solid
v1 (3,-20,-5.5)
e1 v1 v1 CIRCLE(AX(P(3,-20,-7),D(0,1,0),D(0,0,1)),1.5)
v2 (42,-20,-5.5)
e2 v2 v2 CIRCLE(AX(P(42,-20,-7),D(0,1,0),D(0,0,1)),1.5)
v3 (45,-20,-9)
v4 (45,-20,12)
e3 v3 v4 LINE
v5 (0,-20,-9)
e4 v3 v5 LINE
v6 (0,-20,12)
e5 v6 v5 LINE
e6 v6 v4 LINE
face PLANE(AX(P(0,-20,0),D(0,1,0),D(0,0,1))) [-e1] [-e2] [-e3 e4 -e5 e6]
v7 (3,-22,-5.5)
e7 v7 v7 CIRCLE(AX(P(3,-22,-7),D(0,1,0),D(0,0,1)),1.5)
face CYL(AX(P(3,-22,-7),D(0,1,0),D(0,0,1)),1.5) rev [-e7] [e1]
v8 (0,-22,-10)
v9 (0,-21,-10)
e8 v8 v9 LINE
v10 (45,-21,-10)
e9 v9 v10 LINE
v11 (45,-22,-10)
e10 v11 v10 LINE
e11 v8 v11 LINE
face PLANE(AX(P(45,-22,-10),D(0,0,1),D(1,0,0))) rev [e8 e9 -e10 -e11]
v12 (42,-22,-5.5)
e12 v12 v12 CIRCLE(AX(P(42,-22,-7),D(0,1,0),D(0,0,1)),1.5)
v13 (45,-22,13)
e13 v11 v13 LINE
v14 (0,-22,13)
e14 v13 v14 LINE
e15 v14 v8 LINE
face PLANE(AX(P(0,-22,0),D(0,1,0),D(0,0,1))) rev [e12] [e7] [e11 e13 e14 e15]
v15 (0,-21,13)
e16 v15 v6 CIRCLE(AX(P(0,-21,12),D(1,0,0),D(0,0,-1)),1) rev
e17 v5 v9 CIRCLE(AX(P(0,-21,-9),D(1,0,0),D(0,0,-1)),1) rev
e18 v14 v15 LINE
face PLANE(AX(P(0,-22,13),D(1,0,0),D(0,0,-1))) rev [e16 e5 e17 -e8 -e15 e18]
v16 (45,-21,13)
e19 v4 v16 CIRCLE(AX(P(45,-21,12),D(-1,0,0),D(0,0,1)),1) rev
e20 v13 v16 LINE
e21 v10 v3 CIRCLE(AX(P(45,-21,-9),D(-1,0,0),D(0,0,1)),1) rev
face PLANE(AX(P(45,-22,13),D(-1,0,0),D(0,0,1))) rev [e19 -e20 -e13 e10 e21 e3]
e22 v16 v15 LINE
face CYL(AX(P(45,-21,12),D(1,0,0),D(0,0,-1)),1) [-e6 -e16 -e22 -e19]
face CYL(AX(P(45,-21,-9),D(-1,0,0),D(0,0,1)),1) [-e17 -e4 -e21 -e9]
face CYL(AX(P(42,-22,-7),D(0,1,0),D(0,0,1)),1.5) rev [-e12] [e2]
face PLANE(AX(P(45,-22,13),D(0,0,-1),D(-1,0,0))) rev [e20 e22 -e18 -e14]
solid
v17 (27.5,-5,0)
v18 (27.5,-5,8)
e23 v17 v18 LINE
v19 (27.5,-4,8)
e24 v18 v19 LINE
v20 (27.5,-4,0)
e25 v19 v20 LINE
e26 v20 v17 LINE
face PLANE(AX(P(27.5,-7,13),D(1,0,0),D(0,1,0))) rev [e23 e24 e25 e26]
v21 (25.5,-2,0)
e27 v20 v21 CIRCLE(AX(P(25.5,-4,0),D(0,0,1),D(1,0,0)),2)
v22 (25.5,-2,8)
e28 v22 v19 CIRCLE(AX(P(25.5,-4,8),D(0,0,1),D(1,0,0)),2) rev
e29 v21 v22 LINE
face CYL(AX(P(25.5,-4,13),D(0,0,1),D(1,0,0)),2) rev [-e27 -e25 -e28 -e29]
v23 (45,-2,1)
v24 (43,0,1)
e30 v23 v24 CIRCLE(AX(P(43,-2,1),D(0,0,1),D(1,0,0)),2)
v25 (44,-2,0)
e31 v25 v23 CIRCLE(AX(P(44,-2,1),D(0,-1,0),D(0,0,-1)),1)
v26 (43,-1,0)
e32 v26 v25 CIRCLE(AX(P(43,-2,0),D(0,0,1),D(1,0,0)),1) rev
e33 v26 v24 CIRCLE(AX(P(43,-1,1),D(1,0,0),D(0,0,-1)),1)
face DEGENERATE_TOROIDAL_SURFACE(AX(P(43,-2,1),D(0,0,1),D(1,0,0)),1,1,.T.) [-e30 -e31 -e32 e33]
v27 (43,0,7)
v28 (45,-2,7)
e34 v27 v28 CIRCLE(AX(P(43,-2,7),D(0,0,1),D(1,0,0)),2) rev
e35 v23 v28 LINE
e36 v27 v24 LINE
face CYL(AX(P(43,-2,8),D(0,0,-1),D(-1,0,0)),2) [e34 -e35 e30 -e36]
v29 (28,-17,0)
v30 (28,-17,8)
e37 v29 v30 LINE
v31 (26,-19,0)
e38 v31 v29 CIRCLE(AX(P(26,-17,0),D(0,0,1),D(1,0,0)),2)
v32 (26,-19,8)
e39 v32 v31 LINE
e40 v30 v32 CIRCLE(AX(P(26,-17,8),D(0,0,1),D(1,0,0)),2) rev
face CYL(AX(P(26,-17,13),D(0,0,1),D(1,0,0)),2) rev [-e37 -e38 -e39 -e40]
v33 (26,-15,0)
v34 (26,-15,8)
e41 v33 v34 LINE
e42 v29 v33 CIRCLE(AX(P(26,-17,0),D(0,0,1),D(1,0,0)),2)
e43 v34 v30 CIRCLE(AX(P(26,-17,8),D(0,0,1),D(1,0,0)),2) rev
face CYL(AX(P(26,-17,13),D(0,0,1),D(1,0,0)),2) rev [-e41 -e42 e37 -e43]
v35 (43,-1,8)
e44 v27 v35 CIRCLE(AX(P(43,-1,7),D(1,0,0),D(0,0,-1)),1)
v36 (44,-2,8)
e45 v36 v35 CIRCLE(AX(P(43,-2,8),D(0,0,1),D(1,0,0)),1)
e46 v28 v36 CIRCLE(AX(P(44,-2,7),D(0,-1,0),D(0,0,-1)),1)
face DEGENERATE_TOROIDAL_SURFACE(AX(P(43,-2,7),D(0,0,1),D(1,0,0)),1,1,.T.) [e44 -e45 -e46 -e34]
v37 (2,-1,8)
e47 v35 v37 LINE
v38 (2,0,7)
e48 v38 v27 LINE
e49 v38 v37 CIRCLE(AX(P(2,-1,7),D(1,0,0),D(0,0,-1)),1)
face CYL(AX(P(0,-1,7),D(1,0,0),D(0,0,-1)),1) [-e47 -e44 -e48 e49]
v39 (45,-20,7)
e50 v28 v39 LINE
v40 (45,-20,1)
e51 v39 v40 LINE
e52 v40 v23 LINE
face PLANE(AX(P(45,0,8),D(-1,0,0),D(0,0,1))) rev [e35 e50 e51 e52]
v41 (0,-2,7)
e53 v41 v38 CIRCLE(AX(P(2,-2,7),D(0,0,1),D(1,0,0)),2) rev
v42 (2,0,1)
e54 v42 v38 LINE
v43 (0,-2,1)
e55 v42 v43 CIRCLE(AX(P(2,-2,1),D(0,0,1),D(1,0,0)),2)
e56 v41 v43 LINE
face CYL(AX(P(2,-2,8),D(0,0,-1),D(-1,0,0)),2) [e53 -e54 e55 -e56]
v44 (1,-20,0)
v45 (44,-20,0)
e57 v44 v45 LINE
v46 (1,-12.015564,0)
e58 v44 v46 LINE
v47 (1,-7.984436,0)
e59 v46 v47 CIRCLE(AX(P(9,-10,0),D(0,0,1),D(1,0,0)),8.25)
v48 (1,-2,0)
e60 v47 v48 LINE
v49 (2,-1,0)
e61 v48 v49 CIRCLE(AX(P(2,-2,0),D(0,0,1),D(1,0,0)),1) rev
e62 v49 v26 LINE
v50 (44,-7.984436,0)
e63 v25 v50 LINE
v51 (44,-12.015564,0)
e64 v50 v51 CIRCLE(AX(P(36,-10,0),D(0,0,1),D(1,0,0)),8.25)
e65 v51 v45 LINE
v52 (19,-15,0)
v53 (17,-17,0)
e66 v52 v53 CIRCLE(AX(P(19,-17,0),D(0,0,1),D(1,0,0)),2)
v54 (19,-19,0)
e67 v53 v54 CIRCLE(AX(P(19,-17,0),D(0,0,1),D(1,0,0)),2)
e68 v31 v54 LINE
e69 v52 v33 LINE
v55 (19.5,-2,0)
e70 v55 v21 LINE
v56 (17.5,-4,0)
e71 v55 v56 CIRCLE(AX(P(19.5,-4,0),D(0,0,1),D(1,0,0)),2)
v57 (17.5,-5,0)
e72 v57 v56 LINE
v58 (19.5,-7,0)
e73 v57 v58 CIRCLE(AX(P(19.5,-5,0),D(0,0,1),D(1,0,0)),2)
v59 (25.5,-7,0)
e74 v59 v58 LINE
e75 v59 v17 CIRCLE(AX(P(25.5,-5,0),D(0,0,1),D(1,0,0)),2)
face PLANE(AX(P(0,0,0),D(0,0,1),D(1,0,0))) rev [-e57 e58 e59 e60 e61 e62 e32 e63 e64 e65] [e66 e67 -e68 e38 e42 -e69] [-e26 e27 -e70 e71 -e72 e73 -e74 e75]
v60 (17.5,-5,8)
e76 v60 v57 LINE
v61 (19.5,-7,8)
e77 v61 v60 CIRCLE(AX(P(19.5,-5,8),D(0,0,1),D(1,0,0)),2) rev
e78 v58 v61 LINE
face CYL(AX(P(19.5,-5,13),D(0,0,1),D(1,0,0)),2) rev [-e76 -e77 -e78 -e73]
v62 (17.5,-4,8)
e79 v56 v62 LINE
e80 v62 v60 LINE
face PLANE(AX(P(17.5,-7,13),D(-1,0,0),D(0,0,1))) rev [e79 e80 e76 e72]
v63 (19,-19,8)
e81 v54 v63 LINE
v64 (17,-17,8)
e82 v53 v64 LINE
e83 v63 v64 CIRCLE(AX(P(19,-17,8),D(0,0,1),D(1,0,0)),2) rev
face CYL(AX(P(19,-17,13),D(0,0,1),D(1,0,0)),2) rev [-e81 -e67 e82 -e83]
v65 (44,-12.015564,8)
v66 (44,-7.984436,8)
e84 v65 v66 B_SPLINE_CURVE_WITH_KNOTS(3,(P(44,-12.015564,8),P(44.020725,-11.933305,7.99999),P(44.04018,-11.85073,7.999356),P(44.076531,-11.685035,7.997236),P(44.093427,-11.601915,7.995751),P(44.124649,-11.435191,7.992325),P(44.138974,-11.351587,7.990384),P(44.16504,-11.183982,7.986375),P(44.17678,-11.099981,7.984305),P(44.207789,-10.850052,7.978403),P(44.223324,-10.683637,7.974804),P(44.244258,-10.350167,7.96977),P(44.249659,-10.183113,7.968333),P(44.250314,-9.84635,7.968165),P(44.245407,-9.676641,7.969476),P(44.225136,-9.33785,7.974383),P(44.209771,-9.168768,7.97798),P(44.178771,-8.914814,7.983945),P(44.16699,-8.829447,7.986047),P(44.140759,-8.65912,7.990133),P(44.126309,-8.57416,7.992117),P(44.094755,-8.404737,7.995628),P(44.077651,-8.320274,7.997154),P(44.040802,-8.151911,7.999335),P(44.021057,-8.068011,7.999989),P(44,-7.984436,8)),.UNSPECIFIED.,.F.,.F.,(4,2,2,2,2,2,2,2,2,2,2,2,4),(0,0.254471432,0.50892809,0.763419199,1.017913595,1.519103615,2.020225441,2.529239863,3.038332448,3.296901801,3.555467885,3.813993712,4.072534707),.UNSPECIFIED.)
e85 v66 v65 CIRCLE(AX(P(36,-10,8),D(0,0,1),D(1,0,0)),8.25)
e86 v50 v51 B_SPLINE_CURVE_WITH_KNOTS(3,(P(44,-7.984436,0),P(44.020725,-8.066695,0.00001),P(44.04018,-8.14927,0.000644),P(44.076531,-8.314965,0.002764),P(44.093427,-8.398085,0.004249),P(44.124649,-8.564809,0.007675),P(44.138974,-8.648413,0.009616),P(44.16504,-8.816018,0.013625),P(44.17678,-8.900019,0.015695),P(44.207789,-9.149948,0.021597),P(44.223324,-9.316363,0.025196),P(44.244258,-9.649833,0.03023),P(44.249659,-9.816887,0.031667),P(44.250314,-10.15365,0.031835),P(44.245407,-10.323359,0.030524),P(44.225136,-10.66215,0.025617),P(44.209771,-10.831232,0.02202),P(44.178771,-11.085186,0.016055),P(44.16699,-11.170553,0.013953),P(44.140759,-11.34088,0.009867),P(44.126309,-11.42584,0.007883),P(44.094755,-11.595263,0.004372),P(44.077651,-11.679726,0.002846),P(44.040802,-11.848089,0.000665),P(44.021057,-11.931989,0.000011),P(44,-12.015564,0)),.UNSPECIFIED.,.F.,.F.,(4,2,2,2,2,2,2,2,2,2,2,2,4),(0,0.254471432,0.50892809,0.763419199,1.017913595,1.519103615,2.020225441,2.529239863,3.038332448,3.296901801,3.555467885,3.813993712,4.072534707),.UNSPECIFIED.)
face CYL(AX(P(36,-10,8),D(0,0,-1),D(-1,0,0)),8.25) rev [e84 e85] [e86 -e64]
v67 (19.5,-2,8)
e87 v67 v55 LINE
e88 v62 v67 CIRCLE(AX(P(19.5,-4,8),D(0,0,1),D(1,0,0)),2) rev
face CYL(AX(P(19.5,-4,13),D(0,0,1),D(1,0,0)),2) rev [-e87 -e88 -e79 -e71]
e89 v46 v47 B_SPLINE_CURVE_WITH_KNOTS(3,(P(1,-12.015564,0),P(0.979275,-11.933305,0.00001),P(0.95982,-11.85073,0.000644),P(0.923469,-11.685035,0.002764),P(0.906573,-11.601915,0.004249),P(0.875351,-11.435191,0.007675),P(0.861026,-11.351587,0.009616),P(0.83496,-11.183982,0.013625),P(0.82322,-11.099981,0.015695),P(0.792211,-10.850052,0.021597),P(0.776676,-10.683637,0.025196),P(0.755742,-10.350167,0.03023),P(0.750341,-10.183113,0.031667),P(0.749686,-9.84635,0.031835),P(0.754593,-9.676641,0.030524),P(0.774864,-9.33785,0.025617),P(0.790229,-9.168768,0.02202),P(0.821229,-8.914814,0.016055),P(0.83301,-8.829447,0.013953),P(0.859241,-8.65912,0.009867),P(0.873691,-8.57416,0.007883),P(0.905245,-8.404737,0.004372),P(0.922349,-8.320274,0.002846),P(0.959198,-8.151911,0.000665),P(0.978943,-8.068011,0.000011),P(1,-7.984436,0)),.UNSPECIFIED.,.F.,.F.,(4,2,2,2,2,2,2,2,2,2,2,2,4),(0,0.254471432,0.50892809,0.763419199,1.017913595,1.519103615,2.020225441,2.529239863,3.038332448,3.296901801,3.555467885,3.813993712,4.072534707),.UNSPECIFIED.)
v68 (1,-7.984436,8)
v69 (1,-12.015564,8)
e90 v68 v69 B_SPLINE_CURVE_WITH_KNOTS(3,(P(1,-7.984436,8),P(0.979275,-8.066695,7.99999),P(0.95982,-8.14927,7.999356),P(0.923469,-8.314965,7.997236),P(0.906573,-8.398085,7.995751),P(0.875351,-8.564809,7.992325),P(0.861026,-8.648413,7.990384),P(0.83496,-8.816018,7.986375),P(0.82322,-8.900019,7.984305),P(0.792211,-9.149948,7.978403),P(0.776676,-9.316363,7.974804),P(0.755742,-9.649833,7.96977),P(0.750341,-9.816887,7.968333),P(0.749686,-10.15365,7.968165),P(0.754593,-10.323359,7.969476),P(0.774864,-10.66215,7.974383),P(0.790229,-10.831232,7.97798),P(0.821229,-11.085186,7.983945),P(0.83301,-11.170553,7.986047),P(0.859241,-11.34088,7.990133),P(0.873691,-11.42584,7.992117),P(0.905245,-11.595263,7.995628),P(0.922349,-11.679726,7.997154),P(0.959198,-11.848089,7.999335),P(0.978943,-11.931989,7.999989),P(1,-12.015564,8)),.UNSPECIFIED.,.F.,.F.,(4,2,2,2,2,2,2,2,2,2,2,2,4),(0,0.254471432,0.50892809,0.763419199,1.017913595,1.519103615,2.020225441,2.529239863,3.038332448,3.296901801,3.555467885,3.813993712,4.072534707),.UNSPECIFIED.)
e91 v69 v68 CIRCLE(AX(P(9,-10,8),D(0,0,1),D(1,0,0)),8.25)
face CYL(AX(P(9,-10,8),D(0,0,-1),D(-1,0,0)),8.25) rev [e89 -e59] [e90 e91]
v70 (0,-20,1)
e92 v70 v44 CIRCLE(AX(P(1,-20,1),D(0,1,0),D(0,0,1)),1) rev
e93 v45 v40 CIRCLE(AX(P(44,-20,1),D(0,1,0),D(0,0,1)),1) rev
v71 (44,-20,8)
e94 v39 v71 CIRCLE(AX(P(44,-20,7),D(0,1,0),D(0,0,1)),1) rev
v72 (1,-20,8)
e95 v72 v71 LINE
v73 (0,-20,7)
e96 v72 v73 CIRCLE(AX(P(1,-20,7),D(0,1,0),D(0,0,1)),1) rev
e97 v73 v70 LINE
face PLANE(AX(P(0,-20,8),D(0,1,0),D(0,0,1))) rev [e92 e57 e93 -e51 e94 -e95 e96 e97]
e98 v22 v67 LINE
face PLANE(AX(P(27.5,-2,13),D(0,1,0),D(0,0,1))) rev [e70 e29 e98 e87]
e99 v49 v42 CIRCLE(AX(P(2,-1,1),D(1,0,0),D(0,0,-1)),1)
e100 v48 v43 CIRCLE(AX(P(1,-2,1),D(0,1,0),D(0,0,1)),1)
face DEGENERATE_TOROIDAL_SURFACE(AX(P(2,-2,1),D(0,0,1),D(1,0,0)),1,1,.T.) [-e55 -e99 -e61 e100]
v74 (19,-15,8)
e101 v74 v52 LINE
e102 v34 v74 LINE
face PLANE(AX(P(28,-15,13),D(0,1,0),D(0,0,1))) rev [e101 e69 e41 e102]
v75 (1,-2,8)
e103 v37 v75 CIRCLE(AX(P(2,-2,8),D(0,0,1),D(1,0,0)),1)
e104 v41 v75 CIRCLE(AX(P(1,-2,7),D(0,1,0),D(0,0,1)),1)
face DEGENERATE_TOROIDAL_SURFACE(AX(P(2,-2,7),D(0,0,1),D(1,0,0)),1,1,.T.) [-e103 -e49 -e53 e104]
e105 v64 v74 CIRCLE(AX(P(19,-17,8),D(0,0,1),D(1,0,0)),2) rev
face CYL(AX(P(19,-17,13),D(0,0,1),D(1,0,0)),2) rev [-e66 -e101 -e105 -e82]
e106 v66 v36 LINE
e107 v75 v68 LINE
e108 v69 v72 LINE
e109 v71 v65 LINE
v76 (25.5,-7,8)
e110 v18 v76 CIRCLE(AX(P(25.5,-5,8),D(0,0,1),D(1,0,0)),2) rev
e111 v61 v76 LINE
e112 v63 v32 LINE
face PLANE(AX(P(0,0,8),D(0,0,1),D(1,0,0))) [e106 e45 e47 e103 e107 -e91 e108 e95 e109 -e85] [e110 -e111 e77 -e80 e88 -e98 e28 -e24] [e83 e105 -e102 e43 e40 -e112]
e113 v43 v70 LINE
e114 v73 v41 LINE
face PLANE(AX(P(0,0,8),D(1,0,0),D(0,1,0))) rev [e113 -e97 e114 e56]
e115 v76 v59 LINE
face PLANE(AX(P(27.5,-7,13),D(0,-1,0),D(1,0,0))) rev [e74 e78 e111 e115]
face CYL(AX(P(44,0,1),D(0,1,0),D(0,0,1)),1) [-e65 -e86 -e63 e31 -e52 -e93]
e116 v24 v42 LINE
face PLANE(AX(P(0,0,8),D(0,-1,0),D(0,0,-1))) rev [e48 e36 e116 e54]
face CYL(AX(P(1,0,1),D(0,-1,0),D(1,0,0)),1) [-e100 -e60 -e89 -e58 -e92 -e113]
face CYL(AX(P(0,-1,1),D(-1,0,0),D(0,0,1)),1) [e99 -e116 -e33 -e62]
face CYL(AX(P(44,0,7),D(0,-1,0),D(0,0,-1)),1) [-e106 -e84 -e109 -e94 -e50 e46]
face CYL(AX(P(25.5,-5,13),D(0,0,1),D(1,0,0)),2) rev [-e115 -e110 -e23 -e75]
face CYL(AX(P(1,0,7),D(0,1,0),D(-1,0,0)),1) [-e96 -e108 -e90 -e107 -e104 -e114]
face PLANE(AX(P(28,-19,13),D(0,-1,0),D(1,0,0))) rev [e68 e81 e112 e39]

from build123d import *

# Parameters (mm, degrees)
CROQUIS1_W              = 45
CROQUIS1_H              = 20
CROQUIS1_R              = 8.25
SALIENTE_EXTRUIR1_DEPTH = 8
CROQUIS2_W              = 45
CROQUIS2_H              = 23
SALIENTE_EXTRUIR2_DEPTH = 2
CROQUIS4_W              = 11
CROQUIS4_H              = 4
CROQUIS4_W_2            = 10
CROQUIS4_H_2            = 5
CORTAR_EXTRUIR3_DEPTH   = 52.749396132
CROQUIS5_R              = 1.5
CORTAR_EXTRUIR4_DEPTH   = 51.931326313
REDONDEO1_R             = 2
REDONDEO2_R             = 2
REDONDEO3_R             = 1
REDONDEO5_R             = 1


# Some blends are built 0.0001 mm under size
with BuildPart() as part:
    # Croquis1 → Saliente-Extruir1 (new body)
    with BuildSketch(Plane.XY):
        with Locations((22.5, -10)):
            Rectangle(CROQUIS1_W, CROQUIS1_H)
        with Locations((9, -10)):
            Circle(CROQUIS1_R, mode=Mode.SUBTRACT)
        with Locations((36, -10)):
            Circle(CROQUIS1_R, mode=Mode.SUBTRACT)
    extrude(amount=SALIENTE_EXTRUIR1_DEPTH)

    # Croquis4 → Cortar-Extruir3 (cut, through all)
    with BuildSketch(Plane(origin=(0, 0, 0), x_dir=(-1, 0, 0), z_dir=(0, 0, -1))):
        with Locations((-22.5, -17)):
            Rectangle(CROQUIS4_W, CROQUIS4_H)
        with Locations((-22.5, -4.5)):
            Rectangle(CROQUIS4_W_2, CROQUIS4_H_2)
    extrude(amount=-CORTAR_EXTRUIR3_DEPTH, mode=Mode.SUBTRACT)

    # Redondeo1
    redondeo1_edges = [part.edges().sort_by_distance(p)[0] for p in [
        (17, -19, 4),
        (28, -15, 4),
        (17, -15, 4),
        (28, -19, 4),
    ]]
    fillet(redondeo1_edges, radius=REDONDEO1_R - 0.0001)  # a hair under: the kernel refuses the full size

    # Redondeo2
    redondeo2_edges = [part.edges().sort_by_distance(p)[0] for p in [
        (17.5, -7, 4),
        (27.5, -7, 4),
        (27.5, -2, 4),
        (17.5, -2, 4),
        (0, 0, 4),
        (45, 0, 4),
    ]]
    fillet(redondeo2_edges, radius=REDONDEO2_R)

    # Redondeo3
    # the kernel refuses this fillet: 1 mm, written as the material it takes off along each edge
    with BuildSketch(Plane(origin=(45, -2, 8), x_dir=(0, 0, -1), z_dir=(0, -1, 0)), Plane(origin=(45, -2, 0), x_dir=(-1, 0, 0), z_dir=(0, -1, 0)), Plane(origin=(0, -22.5, 0), x_dir=(1, 0, 0), z_dir=(0, 1, 0)), Plane(origin=(0, -22.5, 8), x_dir=(0, 0, -1), z_dir=(0, 1, 0))) as redondeo3_piece_1:
        with BuildLine():
            CenterArc((REDONDEO3_R, -REDONDEO3_R), REDONDEO3_R, 90, 90)
            Line((0, -REDONDEO3_R), (0, 0))
            Line((0, 0), (REDONDEO3_R, 0))
        make_face()
    extrude(amount=20.5, mode=Mode.SUBTRACT)
    with BuildSketch(Plane(origin=(2, 0, 0), x_dir=(0, -1, 0), z_dir=(1, 0, 0)), Plane(origin=(2, 0, 8), x_dir=(0, 0, -1), z_dir=(1, 0, 0))) as redondeo3_piece_2:
        with BuildLine():
            CenterArc((REDONDEO3_R, -REDONDEO3_R), REDONDEO3_R, 90, 90)
            Line((0, -REDONDEO3_R), (0, 0))
            Line((0, 0), (REDONDEO3_R, 0))
        make_face()
    extrude(amount=41, mode=Mode.SUBTRACT)
    with BuildSketch(Plane(origin=(2, -2, 0), x_dir=(0, 1, 0), z_dir=(1, 0, 0))) as redondeo3_piece_3:
        with BuildLine():
            CenterArc((2 - REDONDEO3_R, REDONDEO3_R), REDONDEO3_R, 270, 90)
            Line((2, REDONDEO3_R), (2, 0))
            Line((2, 0), (2 - REDONDEO3_R, 0))
        make_face()
    revolve(axis=Axis((2, -2, 0), (0, 0, 1)), revolution_arc=90, mode=Mode.SUBTRACT)
    with BuildSketch(Plane(origin=(43, -2, 0), x_dir=(0, 1, 0), z_dir=(-1, 0, 0))) as redondeo3_piece_4:
        with BuildLine():
            CenterArc((2 - REDONDEO3_R, -REDONDEO3_R), REDONDEO3_R, 0, 90)
            Line((2, -REDONDEO3_R), (2, 0))
            Line((2, 0), (2 - REDONDEO3_R, 0))
        make_face()
    revolve(axis=Axis((43, -2, 0), (0, 0, -1)), revolution_arc=90, mode=Mode.SUBTRACT)
    with BuildSketch(Plane(origin=(2, -2, 8), x_dir=(0, 1, 0), z_dir=(1, 0, 0))) as redondeo3_piece_5:
        with BuildLine():
            CenterArc((2 - REDONDEO3_R, -REDONDEO3_R), REDONDEO3_R, 0, 90)
            Line((2 - REDONDEO3_R, 0), (2, 0))
            Line((2, 0), (2, -REDONDEO3_R))
        make_face()
    revolve(axis=Axis((2, -2, 8), (0, 0, 1)), revolution_arc=90, mode=Mode.SUBTRACT)
    with BuildSketch(Plane(origin=(43, -2, 8), x_dir=(0, 1, 0), z_dir=(-1, 0, 0))) as redondeo3_piece_6:
        with BuildLine():
            CenterArc((2 - REDONDEO3_R, REDONDEO3_R), REDONDEO3_R, 270, 90)
            Line((2 - REDONDEO3_R, 0), (2, 0))
            Line((2, 0), (2, REDONDEO3_R))
        make_face()
    revolve(axis=Axis((43, -2, 8), (0, 0, -1)), revolution_arc=90, mode=Mode.SUBTRACT)


with BuildPart() as body_2:
    # Croquis2 → Saliente-Extruir2 (new body)
    with BuildSketch(Plane(origin=(0, -20, 0), x_dir=(-1, 0, 0), z_dir=(0, -1, 0))):
        with Locations((-22.5, -1.5)):
            Rectangle(CROQUIS2_W, CROQUIS2_H)
    extrude(amount=SALIENTE_EXTRUIR2_DEPTH)

    # Croquis5 → Cortar-Extruir4 (cut, through all)
    with BuildSketch(Plane(origin=(0, -20, 0), x_dir=(1, 0, 0), z_dir=(0, 1, 0))):
        with Locations(Location((3, 7, 0), (0, 0, 270))):
            Circle(CROQUIS5_R)
        with Locations(Location((42, 7, 0), (0, 0, 270))):
            Circle(CROQUIS5_R)
    extrude(amount=-CORTAR_EXTRUIR4_DEPTH, mode=Mode.SUBTRACT)

    # Redondeo5
    redondeo5_edges = [body_2.edges().sort_by_distance(p)[0] for p in [
        (22.5, -20, -10),
        (22.5, -20, 13),
    ]]
    fillet(redondeo5_edges, radius=REDONDEO5_R)


solid = Compound([part.part, body_2.part])
